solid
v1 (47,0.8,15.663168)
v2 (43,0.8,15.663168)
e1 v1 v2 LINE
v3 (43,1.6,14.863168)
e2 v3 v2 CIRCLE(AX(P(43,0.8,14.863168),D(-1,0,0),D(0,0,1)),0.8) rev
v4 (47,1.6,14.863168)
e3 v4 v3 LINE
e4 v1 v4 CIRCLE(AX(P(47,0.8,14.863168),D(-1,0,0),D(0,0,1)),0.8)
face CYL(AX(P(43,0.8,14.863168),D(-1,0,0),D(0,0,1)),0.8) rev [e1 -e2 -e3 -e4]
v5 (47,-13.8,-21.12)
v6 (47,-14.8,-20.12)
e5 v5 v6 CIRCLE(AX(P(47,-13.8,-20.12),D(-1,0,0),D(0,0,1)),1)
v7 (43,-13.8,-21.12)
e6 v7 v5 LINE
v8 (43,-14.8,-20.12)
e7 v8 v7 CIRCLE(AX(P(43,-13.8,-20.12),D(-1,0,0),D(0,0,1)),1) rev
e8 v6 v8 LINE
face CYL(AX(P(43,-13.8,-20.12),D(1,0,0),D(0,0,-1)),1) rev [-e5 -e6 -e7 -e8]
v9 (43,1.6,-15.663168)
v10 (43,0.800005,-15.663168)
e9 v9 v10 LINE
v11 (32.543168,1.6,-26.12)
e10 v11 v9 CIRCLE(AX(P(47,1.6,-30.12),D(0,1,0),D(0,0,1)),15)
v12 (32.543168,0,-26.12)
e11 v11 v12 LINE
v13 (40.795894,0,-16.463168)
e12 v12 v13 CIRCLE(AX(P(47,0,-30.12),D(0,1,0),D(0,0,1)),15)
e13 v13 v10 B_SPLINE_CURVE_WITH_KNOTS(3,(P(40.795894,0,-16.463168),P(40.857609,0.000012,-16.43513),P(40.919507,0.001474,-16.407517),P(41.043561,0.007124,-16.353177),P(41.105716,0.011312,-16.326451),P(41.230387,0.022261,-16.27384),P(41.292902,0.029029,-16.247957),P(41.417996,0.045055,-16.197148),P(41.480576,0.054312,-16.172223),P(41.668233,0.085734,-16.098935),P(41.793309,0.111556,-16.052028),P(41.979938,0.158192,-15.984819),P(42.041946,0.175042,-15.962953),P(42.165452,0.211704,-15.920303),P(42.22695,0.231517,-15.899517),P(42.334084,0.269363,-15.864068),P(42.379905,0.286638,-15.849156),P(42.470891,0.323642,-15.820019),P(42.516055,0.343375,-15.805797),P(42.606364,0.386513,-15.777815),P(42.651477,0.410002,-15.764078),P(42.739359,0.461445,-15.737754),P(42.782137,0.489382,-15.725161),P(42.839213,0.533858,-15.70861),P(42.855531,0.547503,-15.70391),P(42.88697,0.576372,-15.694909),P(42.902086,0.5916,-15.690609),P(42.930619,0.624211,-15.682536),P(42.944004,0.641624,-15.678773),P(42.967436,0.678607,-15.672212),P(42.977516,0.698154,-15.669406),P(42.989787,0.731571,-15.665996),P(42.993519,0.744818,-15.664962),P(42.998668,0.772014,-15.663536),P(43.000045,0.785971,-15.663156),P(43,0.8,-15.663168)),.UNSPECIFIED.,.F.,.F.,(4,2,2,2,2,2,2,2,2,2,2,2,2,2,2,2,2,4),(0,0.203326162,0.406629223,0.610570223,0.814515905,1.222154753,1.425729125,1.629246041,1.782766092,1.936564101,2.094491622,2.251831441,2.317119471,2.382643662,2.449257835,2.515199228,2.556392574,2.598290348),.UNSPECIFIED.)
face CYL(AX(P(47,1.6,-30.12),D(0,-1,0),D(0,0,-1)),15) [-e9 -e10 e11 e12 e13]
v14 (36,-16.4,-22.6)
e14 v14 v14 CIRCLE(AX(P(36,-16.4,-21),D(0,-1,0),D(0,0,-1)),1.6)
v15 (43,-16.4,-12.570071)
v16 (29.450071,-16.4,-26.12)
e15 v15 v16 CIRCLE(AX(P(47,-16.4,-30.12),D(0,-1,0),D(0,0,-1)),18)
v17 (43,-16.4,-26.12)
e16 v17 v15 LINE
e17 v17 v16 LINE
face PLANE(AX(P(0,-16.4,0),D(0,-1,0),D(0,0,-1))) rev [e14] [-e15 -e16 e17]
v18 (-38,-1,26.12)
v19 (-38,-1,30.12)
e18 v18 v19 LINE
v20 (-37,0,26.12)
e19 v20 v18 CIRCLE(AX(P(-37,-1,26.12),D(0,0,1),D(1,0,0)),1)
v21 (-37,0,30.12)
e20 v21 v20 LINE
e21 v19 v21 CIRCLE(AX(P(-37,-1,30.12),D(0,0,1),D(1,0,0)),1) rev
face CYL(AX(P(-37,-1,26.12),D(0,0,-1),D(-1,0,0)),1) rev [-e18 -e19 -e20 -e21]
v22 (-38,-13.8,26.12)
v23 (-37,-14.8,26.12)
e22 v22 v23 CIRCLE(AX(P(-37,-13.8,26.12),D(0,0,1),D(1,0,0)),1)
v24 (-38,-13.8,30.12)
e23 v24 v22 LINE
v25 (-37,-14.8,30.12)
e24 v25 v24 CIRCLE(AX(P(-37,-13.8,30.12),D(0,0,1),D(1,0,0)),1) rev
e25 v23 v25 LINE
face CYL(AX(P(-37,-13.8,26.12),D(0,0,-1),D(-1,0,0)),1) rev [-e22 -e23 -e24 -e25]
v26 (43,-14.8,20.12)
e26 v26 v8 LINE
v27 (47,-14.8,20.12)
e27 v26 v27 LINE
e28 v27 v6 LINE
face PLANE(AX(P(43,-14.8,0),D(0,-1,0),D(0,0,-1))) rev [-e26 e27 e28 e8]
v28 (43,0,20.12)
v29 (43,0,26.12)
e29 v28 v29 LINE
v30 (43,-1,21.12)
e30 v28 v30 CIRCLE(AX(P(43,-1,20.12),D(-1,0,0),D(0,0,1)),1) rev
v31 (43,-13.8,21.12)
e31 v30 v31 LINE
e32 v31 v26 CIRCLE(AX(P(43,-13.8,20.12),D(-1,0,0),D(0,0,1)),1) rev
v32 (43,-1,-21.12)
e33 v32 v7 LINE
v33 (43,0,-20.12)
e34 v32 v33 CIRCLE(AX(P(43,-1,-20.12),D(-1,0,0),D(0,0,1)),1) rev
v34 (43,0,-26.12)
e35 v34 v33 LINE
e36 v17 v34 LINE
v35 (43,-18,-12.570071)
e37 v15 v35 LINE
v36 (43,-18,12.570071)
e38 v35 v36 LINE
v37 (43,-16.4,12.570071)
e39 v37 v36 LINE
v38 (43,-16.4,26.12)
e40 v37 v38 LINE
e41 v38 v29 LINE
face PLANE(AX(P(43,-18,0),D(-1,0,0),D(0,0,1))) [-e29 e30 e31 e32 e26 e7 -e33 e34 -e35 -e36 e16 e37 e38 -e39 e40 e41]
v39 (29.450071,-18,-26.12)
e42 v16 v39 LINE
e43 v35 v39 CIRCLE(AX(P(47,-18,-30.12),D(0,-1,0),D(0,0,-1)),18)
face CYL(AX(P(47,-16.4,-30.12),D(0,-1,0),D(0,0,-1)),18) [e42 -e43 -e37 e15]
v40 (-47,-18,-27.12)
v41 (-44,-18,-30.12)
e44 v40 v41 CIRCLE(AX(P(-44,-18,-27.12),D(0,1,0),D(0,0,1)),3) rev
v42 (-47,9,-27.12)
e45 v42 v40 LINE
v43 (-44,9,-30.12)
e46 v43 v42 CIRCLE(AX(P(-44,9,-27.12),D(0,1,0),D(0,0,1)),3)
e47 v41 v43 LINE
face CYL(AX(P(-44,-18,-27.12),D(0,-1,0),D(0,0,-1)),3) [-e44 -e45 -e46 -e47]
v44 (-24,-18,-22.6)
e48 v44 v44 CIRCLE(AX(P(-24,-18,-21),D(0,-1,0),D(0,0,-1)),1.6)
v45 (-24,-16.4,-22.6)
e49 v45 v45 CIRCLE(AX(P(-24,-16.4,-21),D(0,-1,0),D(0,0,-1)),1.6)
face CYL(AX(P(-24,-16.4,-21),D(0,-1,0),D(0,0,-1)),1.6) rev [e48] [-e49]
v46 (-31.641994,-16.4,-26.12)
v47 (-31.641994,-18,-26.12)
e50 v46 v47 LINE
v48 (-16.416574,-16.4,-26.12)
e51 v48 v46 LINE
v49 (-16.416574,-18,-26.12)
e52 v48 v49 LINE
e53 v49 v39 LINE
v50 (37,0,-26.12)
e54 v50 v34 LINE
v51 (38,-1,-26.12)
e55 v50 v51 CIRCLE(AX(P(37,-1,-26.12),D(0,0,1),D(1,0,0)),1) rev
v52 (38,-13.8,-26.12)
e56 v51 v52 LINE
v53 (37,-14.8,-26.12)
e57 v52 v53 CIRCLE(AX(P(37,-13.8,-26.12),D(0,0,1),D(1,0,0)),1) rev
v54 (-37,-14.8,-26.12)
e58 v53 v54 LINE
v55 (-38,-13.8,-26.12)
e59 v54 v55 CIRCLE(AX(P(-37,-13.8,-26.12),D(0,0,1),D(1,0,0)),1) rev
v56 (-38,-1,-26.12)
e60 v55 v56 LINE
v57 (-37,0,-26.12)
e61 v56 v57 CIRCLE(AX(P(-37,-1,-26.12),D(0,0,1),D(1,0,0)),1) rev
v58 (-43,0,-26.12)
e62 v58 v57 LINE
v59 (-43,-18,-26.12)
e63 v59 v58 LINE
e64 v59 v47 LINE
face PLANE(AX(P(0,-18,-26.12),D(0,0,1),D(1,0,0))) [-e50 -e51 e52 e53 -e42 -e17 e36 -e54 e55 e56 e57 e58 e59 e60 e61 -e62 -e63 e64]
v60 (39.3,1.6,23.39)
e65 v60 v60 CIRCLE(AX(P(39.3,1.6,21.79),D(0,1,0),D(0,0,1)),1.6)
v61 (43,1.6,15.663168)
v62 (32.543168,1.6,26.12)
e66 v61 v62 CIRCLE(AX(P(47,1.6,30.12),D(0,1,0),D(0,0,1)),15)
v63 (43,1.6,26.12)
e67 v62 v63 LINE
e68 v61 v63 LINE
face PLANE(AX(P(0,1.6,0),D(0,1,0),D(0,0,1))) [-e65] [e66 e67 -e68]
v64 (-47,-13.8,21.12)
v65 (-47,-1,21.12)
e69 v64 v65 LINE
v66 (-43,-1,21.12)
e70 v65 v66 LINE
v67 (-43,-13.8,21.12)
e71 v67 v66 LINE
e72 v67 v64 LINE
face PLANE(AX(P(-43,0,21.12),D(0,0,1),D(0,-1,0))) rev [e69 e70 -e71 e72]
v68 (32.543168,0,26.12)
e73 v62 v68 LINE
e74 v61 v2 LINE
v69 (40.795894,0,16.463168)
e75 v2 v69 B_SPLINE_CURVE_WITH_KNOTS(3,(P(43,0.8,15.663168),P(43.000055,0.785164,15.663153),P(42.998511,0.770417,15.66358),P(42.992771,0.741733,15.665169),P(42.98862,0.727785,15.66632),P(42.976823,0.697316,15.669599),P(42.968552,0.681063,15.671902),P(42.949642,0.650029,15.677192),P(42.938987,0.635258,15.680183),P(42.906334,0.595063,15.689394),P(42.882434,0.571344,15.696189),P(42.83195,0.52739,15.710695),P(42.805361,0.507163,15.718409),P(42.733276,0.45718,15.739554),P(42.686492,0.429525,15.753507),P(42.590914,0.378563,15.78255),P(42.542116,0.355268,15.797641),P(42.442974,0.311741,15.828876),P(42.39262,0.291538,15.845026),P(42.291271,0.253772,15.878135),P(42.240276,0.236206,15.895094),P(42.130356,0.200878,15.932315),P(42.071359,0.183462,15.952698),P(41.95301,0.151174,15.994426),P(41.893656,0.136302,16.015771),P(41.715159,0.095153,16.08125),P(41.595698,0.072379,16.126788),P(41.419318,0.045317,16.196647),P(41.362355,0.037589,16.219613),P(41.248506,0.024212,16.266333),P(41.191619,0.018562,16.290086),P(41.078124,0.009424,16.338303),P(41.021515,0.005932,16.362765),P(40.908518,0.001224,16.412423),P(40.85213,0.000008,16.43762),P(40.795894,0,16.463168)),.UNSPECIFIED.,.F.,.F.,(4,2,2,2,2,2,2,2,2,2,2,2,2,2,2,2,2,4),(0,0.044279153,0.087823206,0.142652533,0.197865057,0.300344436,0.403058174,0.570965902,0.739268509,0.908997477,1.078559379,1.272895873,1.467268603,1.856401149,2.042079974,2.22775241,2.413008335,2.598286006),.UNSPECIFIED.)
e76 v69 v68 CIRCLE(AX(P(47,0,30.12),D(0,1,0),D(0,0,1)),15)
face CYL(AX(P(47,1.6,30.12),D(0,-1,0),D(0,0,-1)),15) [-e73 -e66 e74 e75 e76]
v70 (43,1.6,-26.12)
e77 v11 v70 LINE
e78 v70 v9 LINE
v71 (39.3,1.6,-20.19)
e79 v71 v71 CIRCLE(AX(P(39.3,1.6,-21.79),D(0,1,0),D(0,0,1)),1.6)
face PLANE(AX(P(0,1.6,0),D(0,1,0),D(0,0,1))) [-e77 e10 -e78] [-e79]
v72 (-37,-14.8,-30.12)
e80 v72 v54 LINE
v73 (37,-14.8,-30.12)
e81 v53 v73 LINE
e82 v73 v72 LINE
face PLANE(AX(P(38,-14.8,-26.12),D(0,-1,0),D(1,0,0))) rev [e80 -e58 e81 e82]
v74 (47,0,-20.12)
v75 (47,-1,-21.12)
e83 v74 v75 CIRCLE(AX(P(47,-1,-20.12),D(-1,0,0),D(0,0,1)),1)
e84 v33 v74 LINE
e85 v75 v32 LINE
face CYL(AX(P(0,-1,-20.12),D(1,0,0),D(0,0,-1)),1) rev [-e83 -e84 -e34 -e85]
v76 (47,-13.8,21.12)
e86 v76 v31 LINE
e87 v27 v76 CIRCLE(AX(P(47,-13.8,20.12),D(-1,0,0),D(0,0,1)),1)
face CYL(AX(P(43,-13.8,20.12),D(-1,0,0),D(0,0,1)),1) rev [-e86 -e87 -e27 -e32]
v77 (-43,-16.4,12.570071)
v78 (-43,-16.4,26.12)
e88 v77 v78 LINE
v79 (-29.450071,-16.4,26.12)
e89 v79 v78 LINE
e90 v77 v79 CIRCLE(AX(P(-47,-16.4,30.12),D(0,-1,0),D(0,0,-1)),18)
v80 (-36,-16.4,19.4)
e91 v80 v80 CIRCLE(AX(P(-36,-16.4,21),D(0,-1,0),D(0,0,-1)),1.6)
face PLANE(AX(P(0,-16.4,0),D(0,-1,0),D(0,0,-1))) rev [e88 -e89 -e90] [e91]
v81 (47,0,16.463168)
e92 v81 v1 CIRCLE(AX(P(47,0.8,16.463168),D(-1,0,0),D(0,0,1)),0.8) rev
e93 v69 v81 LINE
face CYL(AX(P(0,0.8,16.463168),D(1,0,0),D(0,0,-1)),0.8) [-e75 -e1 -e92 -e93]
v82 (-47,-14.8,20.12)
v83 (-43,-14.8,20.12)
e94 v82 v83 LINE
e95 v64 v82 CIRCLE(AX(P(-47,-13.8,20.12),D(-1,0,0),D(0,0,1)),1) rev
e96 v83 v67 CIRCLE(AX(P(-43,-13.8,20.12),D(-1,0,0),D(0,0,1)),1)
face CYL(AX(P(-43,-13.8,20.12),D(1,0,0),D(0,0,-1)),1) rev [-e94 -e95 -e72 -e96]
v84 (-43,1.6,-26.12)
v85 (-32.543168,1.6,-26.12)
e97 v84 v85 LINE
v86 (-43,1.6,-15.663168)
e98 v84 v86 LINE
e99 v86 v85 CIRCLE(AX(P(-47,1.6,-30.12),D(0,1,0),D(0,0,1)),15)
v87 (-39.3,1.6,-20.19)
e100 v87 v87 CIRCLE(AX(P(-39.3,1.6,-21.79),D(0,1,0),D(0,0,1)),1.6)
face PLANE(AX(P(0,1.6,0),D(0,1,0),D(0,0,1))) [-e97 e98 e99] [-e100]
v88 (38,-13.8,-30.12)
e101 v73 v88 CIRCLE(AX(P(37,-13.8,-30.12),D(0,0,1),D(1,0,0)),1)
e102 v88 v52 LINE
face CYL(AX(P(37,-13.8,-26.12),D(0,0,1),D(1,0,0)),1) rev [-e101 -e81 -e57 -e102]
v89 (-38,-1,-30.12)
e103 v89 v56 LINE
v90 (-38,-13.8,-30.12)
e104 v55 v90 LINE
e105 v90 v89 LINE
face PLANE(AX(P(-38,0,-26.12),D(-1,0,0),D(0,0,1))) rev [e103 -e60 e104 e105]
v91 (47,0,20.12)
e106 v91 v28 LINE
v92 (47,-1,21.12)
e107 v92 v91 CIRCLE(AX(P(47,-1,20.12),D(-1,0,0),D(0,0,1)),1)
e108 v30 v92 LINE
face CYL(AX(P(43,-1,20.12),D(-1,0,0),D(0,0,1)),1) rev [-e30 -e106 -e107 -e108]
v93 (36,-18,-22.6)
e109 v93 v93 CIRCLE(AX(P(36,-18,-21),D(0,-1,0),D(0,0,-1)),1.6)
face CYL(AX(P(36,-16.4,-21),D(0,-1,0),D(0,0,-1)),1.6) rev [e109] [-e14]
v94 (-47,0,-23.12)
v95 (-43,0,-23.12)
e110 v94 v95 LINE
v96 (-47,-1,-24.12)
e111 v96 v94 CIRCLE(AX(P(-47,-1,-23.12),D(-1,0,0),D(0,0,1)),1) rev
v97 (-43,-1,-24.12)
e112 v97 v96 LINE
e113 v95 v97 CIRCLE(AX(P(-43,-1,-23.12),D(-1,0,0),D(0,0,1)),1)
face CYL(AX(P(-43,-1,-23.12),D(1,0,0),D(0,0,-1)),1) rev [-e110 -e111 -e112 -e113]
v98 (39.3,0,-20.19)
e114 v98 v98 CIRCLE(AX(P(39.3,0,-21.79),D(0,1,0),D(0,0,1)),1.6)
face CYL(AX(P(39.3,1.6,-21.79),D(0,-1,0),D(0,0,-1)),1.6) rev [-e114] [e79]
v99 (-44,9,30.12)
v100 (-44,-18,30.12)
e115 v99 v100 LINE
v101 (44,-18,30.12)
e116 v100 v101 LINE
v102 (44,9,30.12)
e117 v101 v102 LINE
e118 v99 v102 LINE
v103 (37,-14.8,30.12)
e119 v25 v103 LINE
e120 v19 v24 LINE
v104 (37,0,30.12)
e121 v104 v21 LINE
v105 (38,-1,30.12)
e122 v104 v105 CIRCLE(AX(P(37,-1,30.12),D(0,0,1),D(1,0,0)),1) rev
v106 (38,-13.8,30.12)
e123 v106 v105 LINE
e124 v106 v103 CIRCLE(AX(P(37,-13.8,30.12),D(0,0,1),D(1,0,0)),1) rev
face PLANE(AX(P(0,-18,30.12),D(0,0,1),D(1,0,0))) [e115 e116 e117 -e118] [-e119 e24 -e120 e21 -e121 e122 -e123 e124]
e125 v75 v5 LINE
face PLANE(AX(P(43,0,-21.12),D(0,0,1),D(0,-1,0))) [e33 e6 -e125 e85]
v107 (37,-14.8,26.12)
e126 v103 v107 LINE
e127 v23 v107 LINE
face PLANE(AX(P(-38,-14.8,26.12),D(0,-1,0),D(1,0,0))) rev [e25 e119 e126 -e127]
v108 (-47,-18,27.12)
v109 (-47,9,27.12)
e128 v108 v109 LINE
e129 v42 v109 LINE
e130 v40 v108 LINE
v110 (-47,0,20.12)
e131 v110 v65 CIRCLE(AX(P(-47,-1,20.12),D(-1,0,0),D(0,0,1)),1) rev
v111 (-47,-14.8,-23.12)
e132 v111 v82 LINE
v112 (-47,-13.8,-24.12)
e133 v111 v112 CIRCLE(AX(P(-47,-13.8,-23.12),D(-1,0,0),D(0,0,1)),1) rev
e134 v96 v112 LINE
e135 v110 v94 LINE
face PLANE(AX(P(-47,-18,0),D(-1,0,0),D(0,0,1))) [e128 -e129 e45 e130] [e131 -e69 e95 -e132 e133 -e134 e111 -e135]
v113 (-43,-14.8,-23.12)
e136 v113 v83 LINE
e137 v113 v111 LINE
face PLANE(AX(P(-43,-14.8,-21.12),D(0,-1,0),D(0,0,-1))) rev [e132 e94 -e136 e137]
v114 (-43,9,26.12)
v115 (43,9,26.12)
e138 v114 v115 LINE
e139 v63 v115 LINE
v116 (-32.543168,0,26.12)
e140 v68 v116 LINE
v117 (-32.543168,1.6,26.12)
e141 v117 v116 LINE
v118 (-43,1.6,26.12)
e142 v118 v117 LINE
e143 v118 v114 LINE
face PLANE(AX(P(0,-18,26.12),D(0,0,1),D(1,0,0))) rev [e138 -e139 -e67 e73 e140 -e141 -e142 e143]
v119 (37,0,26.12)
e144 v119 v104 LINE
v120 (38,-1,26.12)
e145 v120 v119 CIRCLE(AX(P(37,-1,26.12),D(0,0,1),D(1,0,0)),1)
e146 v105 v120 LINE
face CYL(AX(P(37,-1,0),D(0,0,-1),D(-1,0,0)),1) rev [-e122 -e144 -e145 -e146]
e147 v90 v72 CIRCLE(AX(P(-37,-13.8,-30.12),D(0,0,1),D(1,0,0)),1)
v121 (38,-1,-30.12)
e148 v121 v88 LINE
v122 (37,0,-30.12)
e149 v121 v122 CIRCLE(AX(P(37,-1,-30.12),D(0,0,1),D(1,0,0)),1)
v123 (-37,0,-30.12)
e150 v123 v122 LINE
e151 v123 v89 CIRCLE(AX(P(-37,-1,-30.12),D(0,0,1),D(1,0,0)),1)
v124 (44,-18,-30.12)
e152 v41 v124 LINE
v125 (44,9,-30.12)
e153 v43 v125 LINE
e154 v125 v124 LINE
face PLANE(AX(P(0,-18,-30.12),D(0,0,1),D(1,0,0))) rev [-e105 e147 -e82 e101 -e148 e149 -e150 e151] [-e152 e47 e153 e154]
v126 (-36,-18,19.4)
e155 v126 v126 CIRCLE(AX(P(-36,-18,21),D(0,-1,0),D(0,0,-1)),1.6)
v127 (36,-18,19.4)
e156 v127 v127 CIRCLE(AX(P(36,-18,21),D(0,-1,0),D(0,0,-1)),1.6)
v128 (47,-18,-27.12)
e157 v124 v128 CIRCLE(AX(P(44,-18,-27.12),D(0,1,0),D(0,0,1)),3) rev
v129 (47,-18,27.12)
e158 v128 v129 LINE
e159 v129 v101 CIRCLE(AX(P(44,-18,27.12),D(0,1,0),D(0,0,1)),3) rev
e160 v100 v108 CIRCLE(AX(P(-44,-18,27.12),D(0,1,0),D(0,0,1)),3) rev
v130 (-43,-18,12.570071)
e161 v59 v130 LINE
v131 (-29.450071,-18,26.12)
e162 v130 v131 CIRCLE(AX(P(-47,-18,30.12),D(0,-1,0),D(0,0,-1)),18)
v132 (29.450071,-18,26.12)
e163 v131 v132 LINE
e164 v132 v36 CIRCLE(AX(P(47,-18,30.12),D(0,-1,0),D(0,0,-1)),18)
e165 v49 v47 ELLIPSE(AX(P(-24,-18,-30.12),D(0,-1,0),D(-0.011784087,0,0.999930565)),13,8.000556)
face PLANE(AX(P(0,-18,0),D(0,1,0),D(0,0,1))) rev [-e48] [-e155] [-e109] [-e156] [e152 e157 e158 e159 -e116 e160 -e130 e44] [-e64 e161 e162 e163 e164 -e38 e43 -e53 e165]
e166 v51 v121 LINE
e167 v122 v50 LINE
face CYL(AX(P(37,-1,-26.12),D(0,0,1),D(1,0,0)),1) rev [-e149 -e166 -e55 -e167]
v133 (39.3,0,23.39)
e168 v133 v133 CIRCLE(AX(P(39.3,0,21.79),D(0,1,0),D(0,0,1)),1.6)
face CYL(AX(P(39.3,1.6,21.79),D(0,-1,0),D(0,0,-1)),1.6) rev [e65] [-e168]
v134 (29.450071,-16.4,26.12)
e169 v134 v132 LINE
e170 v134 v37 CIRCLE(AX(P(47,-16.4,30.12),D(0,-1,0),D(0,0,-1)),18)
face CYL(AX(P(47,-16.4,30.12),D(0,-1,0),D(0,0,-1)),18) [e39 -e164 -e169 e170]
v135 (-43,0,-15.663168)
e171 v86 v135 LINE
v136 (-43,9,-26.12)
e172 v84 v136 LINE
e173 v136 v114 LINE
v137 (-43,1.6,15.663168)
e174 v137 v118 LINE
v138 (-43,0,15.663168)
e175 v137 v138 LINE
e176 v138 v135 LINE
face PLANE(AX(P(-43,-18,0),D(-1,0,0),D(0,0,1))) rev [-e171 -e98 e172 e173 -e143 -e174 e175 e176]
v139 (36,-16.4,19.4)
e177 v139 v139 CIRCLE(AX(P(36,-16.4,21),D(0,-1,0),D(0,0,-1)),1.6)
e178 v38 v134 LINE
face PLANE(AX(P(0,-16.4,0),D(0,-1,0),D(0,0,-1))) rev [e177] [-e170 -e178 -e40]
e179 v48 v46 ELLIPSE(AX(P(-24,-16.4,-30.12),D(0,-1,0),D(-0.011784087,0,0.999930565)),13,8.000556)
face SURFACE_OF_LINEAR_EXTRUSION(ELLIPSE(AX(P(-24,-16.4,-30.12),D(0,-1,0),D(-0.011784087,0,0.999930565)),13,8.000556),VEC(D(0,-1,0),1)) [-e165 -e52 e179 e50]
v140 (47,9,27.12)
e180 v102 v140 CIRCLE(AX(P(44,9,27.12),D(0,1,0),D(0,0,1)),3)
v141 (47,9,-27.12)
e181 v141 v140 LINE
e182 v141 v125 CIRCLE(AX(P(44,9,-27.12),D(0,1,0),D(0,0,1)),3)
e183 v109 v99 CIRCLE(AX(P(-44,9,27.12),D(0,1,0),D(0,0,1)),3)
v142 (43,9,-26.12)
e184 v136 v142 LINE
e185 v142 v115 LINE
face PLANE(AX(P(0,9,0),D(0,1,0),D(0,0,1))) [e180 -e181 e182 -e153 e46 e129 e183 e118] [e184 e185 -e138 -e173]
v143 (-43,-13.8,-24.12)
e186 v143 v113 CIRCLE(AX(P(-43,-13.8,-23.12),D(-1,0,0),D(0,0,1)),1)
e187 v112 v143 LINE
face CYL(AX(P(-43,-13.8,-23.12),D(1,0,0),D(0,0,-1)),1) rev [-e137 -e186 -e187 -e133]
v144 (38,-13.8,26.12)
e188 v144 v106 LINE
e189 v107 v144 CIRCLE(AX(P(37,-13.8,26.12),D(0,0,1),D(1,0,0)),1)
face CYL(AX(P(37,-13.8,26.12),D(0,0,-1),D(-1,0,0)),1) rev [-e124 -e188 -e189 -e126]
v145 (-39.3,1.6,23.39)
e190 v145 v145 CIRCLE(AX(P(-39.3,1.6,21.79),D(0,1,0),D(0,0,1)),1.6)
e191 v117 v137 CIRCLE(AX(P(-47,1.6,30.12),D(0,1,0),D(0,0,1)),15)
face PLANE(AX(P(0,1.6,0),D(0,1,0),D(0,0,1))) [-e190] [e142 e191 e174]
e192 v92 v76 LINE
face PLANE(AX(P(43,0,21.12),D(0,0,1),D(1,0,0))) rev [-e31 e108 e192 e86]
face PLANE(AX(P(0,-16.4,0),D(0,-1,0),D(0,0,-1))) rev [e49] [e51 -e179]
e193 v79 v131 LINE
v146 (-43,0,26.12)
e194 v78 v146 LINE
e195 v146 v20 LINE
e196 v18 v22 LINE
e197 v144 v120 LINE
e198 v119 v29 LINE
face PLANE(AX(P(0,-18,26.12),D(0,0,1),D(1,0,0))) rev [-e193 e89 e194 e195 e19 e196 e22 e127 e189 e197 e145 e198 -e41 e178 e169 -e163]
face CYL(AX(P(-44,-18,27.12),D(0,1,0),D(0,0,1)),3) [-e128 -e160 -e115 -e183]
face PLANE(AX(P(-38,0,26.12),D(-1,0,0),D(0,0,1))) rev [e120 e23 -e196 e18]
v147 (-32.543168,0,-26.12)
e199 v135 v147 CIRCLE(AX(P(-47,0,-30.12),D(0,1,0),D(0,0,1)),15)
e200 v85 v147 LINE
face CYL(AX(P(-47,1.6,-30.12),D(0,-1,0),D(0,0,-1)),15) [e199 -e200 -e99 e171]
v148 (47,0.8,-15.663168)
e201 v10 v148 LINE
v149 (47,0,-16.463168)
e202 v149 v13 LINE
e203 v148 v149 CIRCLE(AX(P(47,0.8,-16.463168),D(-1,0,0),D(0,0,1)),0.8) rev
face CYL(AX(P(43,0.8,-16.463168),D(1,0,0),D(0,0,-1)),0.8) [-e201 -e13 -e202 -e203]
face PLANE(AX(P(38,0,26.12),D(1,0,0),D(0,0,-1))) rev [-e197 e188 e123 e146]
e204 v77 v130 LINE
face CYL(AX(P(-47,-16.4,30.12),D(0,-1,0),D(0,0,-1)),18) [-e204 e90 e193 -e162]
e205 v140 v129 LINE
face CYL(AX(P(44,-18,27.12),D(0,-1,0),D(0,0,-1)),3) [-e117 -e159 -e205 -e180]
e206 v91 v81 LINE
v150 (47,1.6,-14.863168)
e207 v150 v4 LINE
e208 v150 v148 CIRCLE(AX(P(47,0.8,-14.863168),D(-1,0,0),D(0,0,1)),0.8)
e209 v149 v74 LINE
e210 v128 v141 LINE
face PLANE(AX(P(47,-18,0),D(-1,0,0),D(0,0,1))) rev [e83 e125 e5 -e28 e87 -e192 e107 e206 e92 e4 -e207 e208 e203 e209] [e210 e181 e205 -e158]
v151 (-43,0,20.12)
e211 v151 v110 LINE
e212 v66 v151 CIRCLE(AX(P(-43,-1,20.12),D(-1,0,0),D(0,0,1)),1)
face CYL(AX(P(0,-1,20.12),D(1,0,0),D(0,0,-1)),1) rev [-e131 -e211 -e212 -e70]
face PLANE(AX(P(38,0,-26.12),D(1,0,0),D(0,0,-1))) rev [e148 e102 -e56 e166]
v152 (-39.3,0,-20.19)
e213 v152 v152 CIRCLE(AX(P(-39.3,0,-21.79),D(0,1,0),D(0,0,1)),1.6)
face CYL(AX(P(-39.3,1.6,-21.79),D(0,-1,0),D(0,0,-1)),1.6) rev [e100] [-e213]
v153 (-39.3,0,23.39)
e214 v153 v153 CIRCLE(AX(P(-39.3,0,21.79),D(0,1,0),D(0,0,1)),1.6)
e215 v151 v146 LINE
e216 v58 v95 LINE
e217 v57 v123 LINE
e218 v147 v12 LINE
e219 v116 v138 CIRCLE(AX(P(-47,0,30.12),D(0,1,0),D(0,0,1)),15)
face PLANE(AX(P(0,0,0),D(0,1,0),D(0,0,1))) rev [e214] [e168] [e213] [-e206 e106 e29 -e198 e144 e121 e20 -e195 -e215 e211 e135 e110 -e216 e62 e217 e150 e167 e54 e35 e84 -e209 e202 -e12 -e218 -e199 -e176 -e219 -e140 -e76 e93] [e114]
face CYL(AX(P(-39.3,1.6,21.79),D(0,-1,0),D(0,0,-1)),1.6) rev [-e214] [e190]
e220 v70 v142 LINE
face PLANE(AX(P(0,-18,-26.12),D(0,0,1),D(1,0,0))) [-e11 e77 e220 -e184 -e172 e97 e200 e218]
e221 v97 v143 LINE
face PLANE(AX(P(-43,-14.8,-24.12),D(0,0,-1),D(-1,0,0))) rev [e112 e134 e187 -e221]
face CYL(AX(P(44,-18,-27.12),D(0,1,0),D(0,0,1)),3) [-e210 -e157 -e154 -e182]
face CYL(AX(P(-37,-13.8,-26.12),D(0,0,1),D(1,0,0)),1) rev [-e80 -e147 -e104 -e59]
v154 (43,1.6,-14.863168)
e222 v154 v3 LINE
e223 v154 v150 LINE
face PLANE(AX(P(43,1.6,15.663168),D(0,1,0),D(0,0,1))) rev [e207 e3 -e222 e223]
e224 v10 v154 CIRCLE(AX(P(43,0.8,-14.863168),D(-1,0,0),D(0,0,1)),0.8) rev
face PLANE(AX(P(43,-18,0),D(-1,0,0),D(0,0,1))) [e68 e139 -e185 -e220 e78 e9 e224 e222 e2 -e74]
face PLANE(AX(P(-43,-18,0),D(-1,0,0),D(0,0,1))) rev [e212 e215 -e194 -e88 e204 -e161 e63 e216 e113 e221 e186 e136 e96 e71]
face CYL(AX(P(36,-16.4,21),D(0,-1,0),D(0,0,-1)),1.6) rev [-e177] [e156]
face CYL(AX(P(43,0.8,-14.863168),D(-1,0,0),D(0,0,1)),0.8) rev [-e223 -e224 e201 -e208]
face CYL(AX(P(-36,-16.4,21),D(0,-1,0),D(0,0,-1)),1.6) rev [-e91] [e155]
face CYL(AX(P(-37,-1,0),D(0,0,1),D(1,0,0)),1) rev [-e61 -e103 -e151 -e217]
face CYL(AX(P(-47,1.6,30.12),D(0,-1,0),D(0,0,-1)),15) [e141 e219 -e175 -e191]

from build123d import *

# Parameters (mm, degrees)
EXTRUDE_1_DEPTH      = 9
EXTRUDE_1_DEPTH_BACK = 18
SKETCH_1_W           = 94
SKETCH_1_H           = 60.24
SKETCH_1_3_R         = 1.6
EXTRUDE_2_DEPTH      = 1.6
SKETCH_2_R           = 1.6
EXTRUDE_3_DEPTH      = 1.6
FILLET_1_R           = 3
SKETCH_3_W           = 42.24
SKETCH_3_H           = 14.8
CUT_EXTRUDE_1_DEPTH  = 4
SKETCH_4_W           = 42.24
SKETCH_4_H           = 14.8
CUT_EXTRUDE_2_DEPTH  = 4
SKETCH_5_W           = 76
SKETCH_5_H           = 14.8
CUT_EXTRUDE_3_DEPTH  = 4
SKETCH_6_W           = 76
SKETCH_6_H           = 14.8
CUT_EXTRUDE_4_DEPTH  = 4
FILLET_2_R           = 1
SKETCH_8_W           = 3
SKETCH_8_H           = 14.8
CUT_EXTRUDE_5_DEPTH  = 4
FILLET_3_R           = 1
SKETCH_9_W           = 31.32633541
SKETCH_9_H           = 1.6
CUT_EXTRUDE_6_DEPTH  = 4
FILLET_5_R           = 0.8


with BuildPart() as part:
    # 草图1 → 凸台-拉伸1 (new, two sides: drawn at the far end of the back side and taken through both)
    with BuildSketch(Plane(origin=(0, 0, 0), x_dir=(1, 0, 0), z_dir=(0, 1, 0)).offset(-EXTRUDE_1_DEPTH_BACK)):
        Rectangle(SKETCH_1_W, SKETCH_1_H)
        Polygon((-43, 15.663167705), (-43, 26.12), (-32.543167705, 26.12), (32.543167705, 26.12), (43, 26.12), (43, 15.663167705), (43, -15.663167705), (43, -26.12), (32.543167705, -26.12), (-32.543167705, -26.12), (-43, -26.12), (-43, -15.663167705), align=None, mode=Mode.SUBTRACT)
    extrude(amount=EXTRUDE_1_DEPTH + EXTRUDE_1_DEPTH_BACK)

    # 草图1<3> → 凸台-拉伸2 (add)
    # profile 1 of 4: a face of its own
    with BuildSketch(Plane(origin=(0, 0, 0), x_dir=(1, 0, 0), z_dir=(0, 1, 0))):
        with BuildLine():
            Line((-32.543167705, 26.12), (-43, 26.12))
            Line((-43, 26.12), (-43, 15.663167705))
            ThreePointArc((-43, 15.663167705), (-36.393398282, 19.513398282), (-32.543167705, 26.12))
        make_face()
        with Locations(Location((-39.3, 21.79, 0), (0, 0, 270))):
            Circle(SKETCH_1_3_R, mode=Mode.SUBTRACT)
    # profile 2 of 4: a face of its own
    with BuildSketch(Plane(origin=(0, 0, 0), x_dir=(1, 0, 0), z_dir=(0, 1, 0))):
        with BuildLine():
            Line((32.543167705, 26.12), (43, 26.12))
            Line((43, 26.12), (43, 15.663167705))
            ThreePointArc((43, 15.663167705), (36.393398282, 19.513398282), (32.543167705, 26.12))
        make_face()
        with Locations(Location((39.3, 21.79, 0), (0, 0, 270))):
            Circle(SKETCH_1_3_R, mode=Mode.SUBTRACT)
    # profile 3 of 4: a face of its own
    with BuildSketch(Plane(origin=(0, 0, 0), x_dir=(1, 0, 0), z_dir=(0, 1, 0))):
        with BuildLine():
            Line((43, -15.663167705), (43, -26.12))
            Line((43, -26.12), (32.543167705, -26.12))
            ThreePointArc((32.543167705, -26.12), (36.393398282, -19.513398282), (43, -15.663167705))
        make_face()
        with Locations(Location((39.3, -21.79, 0), (0, 0, 270))):
            Circle(SKETCH_1_3_R, mode=Mode.SUBTRACT)
    # profile 4 of 4: a face of its own
    with BuildSketch(Plane(origin=(0, 0, 0), x_dir=(1, 0, 0), z_dir=(0, 1, 0))):
        with BuildLine():
            ThreePointArc((-32.543167705, -26.12), (-36.393398282, -19.513398282), (-43, -15.663167705))
            Line((-43, -15.663167705), (-43, -26.12))
            Line((-43, -26.12), (-32.543167705, -26.12))
        make_face()
        with Locations(Location((-39.3, -21.79, 0), (0, 0, 270))):
            Circle(SKETCH_1_3_R, mode=Mode.SUBTRACT)
    extrude(amount=EXTRUDE_2_DEPTH)

    # 草图2 → 凸台-拉伸3 (add)
    # profile 1 of 4: a face of its own
    with BuildSketch(Plane(origin=(0, -18, 0), x_dir=(-1, 0, 0), z_dir=(0, -1, 0))):
        with BuildLine():
            Line((-43, 26.12), (-43, 12.570071225))
            ThreePointArc((-43, 12.570071225), (-34.272077939, 17.392077939), (-29.450071225, 26.12))
            Line((-29.450071225, 26.12), (-43, 26.12))
        make_face()
        with Locations(Location((-36, 21, 0), (0, 0, 90))):
            Circle(SKETCH_2_R, mode=Mode.SUBTRACT)
    # profile 2 of 4: a face of its own
    with BuildSketch(Plane(origin=(0, -18, 0), x_dir=(-1, 0, 0), z_dir=(0, -1, 0))):
        with BuildLine():
            Line((16.416573998, 26.12), (31.641993825, 26.12))
            add(Edge.make_bspline(
                [(16.416573998, 26.12), (24.309284633, -12.12635511), (31.641993825, 26.12)],
                knots=[1.876324373, 1.876324373, 1.876324373, 4.392355682, 4.392355682, 4.392355682], degree=2, weights=[1, 0.307705581, 1]))
        make_face()
        with Locations(Location((24, 21, 0), (0, 0, 90))):
            Circle(SKETCH_2_R, mode=Mode.SUBTRACT)
    # profile 3 of 4: a face of its own
    with BuildSketch(Plane(origin=(0, -18, 0), x_dir=(-1, 0, 0), z_dir=(0, -1, 0))):
        with BuildLine():
            Line((43, -12.570071225), (43, -26.12))
            Line((43, -26.12), (29.450071225, -26.12))
            ThreePointArc((29.450071225, -26.12), (34.272077939, -17.392077939), (43, -12.570071225))
        make_face()
        with Locations(Location((36, -21, 0), (0, 0, 90))):
            Circle(SKETCH_2_R, mode=Mode.SUBTRACT)
    # profile 4 of 4: a face of its own
    with BuildSketch(Plane(origin=(0, -18, 0), x_dir=(-1, 0, 0), z_dir=(0, -1, 0))):
        with BuildLine():
            Line((-43, -26.12), (-29.450071225, -26.12))
            ThreePointArc((-29.450071225, -26.12), (-34.272077939, -17.392077939), (-43, -12.570071225))
            Line((-43, -12.570071225), (-43, -26.12))
        make_face()
        with Locations(Location((-36, -21, 0), (0, 0, 90))):
            Circle(SKETCH_2_R, mode=Mode.SUBTRACT)
    extrude(amount=-EXTRUDE_3_DEPTH)

    # 圆角1
    fillet_1_edges = [part.edges().sort_by_distance(p)[0] for p in [
        (47, -4.5, 30.12),
        (-47, -4.5, 30.12),
        (-47, -4.5, -30.12),
        (47, -4.5, -30.12),
    ]]
    fillet(fillet_1_edges, radius=FILLET_1_R)

    # 草图3 → 切除-拉伸1 (cut)
    with BuildSketch(Plane.ZY.offset(47)):
        with Locations((0, -7.4)):
            Rectangle(SKETCH_3_W, SKETCH_3_H)
    extrude(amount=-CUT_EXTRUDE_1_DEPTH, mode=Mode.SUBTRACT)

    # 草图4 → 切除-拉伸2 (cut)
    with BuildSketch(Plane(origin=(47, 0, 0), x_dir=(0, 0, -1), z_dir=(1, 0, 0))):
        with Locations((0, -7.4)):
            Rectangle(SKETCH_4_W, SKETCH_4_H)
    extrude(amount=-CUT_EXTRUDE_2_DEPTH, mode=Mode.SUBTRACT)

    # 草图5 → 切除-拉伸3 (cut)
    with BuildSketch(Plane.XY.offset(30.12)):
        with Locations((0, -7.4)):
            Rectangle(SKETCH_5_W, SKETCH_5_H)
    extrude(amount=-CUT_EXTRUDE_3_DEPTH, mode=Mode.SUBTRACT)

    # 草图6 → 切除-拉伸4 (cut)
    with BuildSketch(Plane(origin=(0, 0, -30.12), x_dir=(-1, 0, 0), z_dir=(0, 0, -1))):
        with Locations((0, -7.4)):
            Rectangle(SKETCH_6_W, SKETCH_6_H)
    extrude(amount=-CUT_EXTRUDE_4_DEPTH, mode=Mode.SUBTRACT)

    # 圆角2
    fillet_2_edges = [part.edges().sort_by_distance(p)[0] for p in [
        (-45, 0, 21.12),
        (-45, -14.8, 21.12),
        (45, 0, -21.12),
        (45, -14.8, -21.12),
        (45, -14.8, 21.12),
        (45, 0, 21.12),
        (38, 0, 28.12),
        (38, -14.8, 28.12),
        (-38, -14.8, 28.12),
        (-38, 0, 28.12),
        (-38, 0, -28.12),
        (-38, -14.8, -28.12),
        (38, -14.8, -28.12),
        (38, 0, -28.12),
    ]]
    fillet(fillet_2_edges, radius=FILLET_2_R)

    # 草图8 → 切除-拉伸5 (cut)
    with BuildSketch(Plane.ZY.offset(47)):
        with Locations((-22.62, -7.4)):
            Rectangle(SKETCH_8_W, SKETCH_8_H)
    extrude(amount=-CUT_EXTRUDE_5_DEPTH, mode=Mode.SUBTRACT)

    # 圆角3
    fillet_3_edges = [part.edges().sort_by_distance(p)[0] for p in [
        (-45, -14.8, -24.12),
        (-45, 0, -24.12),
    ]]
    fillet(fillet_3_edges, radius=FILLET_3_R)

    # 草图9 → 切除-拉伸6 (cut)
    with BuildSketch(Plane(origin=(47, 0, 0), x_dir=(0, 0, -1), z_dir=(1, 0, 0))):
        with Locations((0, 0.8)):
            Rectangle(SKETCH_9_W, SKETCH_9_H)
    extrude(amount=-CUT_EXTRUDE_6_DEPTH, mode=Mode.SUBTRACT)

    # 圆角5
    # the kernel refuses this fillet: 0.8 mm, written as the material it adds along each edge
    with BuildSketch(Plane(origin=(47, 1.6, 15.663167705), x_dir=(0, -1, 0), z_dir=(-1, 0, 0))) as fillet_5_piece_1:
        with BuildLine():
            CenterArc((FILLET_5_R, -FILLET_5_R), FILLET_5_R, 90, 90)
            Line((0, -FILLET_5_R), (0, 0))
            Line((0, 0), (FILLET_5_R, 0))
        make_face()
    extrude(amount=4)
    with BuildSketch(Plane(origin=(47, 1.6, -15.663167705), x_dir=(0, -1, 0), z_dir=(-1, 0, 0))) as fillet_5_piece_2:
        with BuildLine():
            CenterArc((FILLET_5_R, FILLET_5_R), FILLET_5_R, 180, 90)
            Line((0, FILLET_5_R), (0, 0))
            Line((0, 0), (FILLET_5_R, 0))
        make_face()
    extrude(amount=4)
    # the kernel refuses this fillet: 0.8 mm, written as the material it takes off along each edge
    with BuildSketch(Plane(origin=(49, 0, -15.663167705), x_dir=(0, 0, -1), z_dir=(-1, 0, 0))) as fillet_5_2_piece_1:
        with BuildLine():
            CenterArc((FILLET_5_R, -FILLET_5_R), FILLET_5_R, 90, 90)
            Line((0, -FILLET_5_R), (0, 0))
            Line((0, 0), (FILLET_5_R, 0))
        make_face()
    extrude(amount=9.4, mode=Mode.SUBTRACT)
    with BuildSketch(Plane(origin=(49, 0, 15.663167705), x_dir=(0, 0, 1), z_dir=(-1, 0, 0))) as fillet_5_2_piece_2:
        with BuildLine():
            CenterArc((FILLET_5_R, FILLET_5_R), FILLET_5_R, 180, 90)
            Line((0, FILLET_5_R), (0, 0))
            Line((0, 0), (FILLET_5_R, 0))
        make_face()
    extrude(amount=9.4, mode=Mode.SUBTRACT)


solid = part.part
